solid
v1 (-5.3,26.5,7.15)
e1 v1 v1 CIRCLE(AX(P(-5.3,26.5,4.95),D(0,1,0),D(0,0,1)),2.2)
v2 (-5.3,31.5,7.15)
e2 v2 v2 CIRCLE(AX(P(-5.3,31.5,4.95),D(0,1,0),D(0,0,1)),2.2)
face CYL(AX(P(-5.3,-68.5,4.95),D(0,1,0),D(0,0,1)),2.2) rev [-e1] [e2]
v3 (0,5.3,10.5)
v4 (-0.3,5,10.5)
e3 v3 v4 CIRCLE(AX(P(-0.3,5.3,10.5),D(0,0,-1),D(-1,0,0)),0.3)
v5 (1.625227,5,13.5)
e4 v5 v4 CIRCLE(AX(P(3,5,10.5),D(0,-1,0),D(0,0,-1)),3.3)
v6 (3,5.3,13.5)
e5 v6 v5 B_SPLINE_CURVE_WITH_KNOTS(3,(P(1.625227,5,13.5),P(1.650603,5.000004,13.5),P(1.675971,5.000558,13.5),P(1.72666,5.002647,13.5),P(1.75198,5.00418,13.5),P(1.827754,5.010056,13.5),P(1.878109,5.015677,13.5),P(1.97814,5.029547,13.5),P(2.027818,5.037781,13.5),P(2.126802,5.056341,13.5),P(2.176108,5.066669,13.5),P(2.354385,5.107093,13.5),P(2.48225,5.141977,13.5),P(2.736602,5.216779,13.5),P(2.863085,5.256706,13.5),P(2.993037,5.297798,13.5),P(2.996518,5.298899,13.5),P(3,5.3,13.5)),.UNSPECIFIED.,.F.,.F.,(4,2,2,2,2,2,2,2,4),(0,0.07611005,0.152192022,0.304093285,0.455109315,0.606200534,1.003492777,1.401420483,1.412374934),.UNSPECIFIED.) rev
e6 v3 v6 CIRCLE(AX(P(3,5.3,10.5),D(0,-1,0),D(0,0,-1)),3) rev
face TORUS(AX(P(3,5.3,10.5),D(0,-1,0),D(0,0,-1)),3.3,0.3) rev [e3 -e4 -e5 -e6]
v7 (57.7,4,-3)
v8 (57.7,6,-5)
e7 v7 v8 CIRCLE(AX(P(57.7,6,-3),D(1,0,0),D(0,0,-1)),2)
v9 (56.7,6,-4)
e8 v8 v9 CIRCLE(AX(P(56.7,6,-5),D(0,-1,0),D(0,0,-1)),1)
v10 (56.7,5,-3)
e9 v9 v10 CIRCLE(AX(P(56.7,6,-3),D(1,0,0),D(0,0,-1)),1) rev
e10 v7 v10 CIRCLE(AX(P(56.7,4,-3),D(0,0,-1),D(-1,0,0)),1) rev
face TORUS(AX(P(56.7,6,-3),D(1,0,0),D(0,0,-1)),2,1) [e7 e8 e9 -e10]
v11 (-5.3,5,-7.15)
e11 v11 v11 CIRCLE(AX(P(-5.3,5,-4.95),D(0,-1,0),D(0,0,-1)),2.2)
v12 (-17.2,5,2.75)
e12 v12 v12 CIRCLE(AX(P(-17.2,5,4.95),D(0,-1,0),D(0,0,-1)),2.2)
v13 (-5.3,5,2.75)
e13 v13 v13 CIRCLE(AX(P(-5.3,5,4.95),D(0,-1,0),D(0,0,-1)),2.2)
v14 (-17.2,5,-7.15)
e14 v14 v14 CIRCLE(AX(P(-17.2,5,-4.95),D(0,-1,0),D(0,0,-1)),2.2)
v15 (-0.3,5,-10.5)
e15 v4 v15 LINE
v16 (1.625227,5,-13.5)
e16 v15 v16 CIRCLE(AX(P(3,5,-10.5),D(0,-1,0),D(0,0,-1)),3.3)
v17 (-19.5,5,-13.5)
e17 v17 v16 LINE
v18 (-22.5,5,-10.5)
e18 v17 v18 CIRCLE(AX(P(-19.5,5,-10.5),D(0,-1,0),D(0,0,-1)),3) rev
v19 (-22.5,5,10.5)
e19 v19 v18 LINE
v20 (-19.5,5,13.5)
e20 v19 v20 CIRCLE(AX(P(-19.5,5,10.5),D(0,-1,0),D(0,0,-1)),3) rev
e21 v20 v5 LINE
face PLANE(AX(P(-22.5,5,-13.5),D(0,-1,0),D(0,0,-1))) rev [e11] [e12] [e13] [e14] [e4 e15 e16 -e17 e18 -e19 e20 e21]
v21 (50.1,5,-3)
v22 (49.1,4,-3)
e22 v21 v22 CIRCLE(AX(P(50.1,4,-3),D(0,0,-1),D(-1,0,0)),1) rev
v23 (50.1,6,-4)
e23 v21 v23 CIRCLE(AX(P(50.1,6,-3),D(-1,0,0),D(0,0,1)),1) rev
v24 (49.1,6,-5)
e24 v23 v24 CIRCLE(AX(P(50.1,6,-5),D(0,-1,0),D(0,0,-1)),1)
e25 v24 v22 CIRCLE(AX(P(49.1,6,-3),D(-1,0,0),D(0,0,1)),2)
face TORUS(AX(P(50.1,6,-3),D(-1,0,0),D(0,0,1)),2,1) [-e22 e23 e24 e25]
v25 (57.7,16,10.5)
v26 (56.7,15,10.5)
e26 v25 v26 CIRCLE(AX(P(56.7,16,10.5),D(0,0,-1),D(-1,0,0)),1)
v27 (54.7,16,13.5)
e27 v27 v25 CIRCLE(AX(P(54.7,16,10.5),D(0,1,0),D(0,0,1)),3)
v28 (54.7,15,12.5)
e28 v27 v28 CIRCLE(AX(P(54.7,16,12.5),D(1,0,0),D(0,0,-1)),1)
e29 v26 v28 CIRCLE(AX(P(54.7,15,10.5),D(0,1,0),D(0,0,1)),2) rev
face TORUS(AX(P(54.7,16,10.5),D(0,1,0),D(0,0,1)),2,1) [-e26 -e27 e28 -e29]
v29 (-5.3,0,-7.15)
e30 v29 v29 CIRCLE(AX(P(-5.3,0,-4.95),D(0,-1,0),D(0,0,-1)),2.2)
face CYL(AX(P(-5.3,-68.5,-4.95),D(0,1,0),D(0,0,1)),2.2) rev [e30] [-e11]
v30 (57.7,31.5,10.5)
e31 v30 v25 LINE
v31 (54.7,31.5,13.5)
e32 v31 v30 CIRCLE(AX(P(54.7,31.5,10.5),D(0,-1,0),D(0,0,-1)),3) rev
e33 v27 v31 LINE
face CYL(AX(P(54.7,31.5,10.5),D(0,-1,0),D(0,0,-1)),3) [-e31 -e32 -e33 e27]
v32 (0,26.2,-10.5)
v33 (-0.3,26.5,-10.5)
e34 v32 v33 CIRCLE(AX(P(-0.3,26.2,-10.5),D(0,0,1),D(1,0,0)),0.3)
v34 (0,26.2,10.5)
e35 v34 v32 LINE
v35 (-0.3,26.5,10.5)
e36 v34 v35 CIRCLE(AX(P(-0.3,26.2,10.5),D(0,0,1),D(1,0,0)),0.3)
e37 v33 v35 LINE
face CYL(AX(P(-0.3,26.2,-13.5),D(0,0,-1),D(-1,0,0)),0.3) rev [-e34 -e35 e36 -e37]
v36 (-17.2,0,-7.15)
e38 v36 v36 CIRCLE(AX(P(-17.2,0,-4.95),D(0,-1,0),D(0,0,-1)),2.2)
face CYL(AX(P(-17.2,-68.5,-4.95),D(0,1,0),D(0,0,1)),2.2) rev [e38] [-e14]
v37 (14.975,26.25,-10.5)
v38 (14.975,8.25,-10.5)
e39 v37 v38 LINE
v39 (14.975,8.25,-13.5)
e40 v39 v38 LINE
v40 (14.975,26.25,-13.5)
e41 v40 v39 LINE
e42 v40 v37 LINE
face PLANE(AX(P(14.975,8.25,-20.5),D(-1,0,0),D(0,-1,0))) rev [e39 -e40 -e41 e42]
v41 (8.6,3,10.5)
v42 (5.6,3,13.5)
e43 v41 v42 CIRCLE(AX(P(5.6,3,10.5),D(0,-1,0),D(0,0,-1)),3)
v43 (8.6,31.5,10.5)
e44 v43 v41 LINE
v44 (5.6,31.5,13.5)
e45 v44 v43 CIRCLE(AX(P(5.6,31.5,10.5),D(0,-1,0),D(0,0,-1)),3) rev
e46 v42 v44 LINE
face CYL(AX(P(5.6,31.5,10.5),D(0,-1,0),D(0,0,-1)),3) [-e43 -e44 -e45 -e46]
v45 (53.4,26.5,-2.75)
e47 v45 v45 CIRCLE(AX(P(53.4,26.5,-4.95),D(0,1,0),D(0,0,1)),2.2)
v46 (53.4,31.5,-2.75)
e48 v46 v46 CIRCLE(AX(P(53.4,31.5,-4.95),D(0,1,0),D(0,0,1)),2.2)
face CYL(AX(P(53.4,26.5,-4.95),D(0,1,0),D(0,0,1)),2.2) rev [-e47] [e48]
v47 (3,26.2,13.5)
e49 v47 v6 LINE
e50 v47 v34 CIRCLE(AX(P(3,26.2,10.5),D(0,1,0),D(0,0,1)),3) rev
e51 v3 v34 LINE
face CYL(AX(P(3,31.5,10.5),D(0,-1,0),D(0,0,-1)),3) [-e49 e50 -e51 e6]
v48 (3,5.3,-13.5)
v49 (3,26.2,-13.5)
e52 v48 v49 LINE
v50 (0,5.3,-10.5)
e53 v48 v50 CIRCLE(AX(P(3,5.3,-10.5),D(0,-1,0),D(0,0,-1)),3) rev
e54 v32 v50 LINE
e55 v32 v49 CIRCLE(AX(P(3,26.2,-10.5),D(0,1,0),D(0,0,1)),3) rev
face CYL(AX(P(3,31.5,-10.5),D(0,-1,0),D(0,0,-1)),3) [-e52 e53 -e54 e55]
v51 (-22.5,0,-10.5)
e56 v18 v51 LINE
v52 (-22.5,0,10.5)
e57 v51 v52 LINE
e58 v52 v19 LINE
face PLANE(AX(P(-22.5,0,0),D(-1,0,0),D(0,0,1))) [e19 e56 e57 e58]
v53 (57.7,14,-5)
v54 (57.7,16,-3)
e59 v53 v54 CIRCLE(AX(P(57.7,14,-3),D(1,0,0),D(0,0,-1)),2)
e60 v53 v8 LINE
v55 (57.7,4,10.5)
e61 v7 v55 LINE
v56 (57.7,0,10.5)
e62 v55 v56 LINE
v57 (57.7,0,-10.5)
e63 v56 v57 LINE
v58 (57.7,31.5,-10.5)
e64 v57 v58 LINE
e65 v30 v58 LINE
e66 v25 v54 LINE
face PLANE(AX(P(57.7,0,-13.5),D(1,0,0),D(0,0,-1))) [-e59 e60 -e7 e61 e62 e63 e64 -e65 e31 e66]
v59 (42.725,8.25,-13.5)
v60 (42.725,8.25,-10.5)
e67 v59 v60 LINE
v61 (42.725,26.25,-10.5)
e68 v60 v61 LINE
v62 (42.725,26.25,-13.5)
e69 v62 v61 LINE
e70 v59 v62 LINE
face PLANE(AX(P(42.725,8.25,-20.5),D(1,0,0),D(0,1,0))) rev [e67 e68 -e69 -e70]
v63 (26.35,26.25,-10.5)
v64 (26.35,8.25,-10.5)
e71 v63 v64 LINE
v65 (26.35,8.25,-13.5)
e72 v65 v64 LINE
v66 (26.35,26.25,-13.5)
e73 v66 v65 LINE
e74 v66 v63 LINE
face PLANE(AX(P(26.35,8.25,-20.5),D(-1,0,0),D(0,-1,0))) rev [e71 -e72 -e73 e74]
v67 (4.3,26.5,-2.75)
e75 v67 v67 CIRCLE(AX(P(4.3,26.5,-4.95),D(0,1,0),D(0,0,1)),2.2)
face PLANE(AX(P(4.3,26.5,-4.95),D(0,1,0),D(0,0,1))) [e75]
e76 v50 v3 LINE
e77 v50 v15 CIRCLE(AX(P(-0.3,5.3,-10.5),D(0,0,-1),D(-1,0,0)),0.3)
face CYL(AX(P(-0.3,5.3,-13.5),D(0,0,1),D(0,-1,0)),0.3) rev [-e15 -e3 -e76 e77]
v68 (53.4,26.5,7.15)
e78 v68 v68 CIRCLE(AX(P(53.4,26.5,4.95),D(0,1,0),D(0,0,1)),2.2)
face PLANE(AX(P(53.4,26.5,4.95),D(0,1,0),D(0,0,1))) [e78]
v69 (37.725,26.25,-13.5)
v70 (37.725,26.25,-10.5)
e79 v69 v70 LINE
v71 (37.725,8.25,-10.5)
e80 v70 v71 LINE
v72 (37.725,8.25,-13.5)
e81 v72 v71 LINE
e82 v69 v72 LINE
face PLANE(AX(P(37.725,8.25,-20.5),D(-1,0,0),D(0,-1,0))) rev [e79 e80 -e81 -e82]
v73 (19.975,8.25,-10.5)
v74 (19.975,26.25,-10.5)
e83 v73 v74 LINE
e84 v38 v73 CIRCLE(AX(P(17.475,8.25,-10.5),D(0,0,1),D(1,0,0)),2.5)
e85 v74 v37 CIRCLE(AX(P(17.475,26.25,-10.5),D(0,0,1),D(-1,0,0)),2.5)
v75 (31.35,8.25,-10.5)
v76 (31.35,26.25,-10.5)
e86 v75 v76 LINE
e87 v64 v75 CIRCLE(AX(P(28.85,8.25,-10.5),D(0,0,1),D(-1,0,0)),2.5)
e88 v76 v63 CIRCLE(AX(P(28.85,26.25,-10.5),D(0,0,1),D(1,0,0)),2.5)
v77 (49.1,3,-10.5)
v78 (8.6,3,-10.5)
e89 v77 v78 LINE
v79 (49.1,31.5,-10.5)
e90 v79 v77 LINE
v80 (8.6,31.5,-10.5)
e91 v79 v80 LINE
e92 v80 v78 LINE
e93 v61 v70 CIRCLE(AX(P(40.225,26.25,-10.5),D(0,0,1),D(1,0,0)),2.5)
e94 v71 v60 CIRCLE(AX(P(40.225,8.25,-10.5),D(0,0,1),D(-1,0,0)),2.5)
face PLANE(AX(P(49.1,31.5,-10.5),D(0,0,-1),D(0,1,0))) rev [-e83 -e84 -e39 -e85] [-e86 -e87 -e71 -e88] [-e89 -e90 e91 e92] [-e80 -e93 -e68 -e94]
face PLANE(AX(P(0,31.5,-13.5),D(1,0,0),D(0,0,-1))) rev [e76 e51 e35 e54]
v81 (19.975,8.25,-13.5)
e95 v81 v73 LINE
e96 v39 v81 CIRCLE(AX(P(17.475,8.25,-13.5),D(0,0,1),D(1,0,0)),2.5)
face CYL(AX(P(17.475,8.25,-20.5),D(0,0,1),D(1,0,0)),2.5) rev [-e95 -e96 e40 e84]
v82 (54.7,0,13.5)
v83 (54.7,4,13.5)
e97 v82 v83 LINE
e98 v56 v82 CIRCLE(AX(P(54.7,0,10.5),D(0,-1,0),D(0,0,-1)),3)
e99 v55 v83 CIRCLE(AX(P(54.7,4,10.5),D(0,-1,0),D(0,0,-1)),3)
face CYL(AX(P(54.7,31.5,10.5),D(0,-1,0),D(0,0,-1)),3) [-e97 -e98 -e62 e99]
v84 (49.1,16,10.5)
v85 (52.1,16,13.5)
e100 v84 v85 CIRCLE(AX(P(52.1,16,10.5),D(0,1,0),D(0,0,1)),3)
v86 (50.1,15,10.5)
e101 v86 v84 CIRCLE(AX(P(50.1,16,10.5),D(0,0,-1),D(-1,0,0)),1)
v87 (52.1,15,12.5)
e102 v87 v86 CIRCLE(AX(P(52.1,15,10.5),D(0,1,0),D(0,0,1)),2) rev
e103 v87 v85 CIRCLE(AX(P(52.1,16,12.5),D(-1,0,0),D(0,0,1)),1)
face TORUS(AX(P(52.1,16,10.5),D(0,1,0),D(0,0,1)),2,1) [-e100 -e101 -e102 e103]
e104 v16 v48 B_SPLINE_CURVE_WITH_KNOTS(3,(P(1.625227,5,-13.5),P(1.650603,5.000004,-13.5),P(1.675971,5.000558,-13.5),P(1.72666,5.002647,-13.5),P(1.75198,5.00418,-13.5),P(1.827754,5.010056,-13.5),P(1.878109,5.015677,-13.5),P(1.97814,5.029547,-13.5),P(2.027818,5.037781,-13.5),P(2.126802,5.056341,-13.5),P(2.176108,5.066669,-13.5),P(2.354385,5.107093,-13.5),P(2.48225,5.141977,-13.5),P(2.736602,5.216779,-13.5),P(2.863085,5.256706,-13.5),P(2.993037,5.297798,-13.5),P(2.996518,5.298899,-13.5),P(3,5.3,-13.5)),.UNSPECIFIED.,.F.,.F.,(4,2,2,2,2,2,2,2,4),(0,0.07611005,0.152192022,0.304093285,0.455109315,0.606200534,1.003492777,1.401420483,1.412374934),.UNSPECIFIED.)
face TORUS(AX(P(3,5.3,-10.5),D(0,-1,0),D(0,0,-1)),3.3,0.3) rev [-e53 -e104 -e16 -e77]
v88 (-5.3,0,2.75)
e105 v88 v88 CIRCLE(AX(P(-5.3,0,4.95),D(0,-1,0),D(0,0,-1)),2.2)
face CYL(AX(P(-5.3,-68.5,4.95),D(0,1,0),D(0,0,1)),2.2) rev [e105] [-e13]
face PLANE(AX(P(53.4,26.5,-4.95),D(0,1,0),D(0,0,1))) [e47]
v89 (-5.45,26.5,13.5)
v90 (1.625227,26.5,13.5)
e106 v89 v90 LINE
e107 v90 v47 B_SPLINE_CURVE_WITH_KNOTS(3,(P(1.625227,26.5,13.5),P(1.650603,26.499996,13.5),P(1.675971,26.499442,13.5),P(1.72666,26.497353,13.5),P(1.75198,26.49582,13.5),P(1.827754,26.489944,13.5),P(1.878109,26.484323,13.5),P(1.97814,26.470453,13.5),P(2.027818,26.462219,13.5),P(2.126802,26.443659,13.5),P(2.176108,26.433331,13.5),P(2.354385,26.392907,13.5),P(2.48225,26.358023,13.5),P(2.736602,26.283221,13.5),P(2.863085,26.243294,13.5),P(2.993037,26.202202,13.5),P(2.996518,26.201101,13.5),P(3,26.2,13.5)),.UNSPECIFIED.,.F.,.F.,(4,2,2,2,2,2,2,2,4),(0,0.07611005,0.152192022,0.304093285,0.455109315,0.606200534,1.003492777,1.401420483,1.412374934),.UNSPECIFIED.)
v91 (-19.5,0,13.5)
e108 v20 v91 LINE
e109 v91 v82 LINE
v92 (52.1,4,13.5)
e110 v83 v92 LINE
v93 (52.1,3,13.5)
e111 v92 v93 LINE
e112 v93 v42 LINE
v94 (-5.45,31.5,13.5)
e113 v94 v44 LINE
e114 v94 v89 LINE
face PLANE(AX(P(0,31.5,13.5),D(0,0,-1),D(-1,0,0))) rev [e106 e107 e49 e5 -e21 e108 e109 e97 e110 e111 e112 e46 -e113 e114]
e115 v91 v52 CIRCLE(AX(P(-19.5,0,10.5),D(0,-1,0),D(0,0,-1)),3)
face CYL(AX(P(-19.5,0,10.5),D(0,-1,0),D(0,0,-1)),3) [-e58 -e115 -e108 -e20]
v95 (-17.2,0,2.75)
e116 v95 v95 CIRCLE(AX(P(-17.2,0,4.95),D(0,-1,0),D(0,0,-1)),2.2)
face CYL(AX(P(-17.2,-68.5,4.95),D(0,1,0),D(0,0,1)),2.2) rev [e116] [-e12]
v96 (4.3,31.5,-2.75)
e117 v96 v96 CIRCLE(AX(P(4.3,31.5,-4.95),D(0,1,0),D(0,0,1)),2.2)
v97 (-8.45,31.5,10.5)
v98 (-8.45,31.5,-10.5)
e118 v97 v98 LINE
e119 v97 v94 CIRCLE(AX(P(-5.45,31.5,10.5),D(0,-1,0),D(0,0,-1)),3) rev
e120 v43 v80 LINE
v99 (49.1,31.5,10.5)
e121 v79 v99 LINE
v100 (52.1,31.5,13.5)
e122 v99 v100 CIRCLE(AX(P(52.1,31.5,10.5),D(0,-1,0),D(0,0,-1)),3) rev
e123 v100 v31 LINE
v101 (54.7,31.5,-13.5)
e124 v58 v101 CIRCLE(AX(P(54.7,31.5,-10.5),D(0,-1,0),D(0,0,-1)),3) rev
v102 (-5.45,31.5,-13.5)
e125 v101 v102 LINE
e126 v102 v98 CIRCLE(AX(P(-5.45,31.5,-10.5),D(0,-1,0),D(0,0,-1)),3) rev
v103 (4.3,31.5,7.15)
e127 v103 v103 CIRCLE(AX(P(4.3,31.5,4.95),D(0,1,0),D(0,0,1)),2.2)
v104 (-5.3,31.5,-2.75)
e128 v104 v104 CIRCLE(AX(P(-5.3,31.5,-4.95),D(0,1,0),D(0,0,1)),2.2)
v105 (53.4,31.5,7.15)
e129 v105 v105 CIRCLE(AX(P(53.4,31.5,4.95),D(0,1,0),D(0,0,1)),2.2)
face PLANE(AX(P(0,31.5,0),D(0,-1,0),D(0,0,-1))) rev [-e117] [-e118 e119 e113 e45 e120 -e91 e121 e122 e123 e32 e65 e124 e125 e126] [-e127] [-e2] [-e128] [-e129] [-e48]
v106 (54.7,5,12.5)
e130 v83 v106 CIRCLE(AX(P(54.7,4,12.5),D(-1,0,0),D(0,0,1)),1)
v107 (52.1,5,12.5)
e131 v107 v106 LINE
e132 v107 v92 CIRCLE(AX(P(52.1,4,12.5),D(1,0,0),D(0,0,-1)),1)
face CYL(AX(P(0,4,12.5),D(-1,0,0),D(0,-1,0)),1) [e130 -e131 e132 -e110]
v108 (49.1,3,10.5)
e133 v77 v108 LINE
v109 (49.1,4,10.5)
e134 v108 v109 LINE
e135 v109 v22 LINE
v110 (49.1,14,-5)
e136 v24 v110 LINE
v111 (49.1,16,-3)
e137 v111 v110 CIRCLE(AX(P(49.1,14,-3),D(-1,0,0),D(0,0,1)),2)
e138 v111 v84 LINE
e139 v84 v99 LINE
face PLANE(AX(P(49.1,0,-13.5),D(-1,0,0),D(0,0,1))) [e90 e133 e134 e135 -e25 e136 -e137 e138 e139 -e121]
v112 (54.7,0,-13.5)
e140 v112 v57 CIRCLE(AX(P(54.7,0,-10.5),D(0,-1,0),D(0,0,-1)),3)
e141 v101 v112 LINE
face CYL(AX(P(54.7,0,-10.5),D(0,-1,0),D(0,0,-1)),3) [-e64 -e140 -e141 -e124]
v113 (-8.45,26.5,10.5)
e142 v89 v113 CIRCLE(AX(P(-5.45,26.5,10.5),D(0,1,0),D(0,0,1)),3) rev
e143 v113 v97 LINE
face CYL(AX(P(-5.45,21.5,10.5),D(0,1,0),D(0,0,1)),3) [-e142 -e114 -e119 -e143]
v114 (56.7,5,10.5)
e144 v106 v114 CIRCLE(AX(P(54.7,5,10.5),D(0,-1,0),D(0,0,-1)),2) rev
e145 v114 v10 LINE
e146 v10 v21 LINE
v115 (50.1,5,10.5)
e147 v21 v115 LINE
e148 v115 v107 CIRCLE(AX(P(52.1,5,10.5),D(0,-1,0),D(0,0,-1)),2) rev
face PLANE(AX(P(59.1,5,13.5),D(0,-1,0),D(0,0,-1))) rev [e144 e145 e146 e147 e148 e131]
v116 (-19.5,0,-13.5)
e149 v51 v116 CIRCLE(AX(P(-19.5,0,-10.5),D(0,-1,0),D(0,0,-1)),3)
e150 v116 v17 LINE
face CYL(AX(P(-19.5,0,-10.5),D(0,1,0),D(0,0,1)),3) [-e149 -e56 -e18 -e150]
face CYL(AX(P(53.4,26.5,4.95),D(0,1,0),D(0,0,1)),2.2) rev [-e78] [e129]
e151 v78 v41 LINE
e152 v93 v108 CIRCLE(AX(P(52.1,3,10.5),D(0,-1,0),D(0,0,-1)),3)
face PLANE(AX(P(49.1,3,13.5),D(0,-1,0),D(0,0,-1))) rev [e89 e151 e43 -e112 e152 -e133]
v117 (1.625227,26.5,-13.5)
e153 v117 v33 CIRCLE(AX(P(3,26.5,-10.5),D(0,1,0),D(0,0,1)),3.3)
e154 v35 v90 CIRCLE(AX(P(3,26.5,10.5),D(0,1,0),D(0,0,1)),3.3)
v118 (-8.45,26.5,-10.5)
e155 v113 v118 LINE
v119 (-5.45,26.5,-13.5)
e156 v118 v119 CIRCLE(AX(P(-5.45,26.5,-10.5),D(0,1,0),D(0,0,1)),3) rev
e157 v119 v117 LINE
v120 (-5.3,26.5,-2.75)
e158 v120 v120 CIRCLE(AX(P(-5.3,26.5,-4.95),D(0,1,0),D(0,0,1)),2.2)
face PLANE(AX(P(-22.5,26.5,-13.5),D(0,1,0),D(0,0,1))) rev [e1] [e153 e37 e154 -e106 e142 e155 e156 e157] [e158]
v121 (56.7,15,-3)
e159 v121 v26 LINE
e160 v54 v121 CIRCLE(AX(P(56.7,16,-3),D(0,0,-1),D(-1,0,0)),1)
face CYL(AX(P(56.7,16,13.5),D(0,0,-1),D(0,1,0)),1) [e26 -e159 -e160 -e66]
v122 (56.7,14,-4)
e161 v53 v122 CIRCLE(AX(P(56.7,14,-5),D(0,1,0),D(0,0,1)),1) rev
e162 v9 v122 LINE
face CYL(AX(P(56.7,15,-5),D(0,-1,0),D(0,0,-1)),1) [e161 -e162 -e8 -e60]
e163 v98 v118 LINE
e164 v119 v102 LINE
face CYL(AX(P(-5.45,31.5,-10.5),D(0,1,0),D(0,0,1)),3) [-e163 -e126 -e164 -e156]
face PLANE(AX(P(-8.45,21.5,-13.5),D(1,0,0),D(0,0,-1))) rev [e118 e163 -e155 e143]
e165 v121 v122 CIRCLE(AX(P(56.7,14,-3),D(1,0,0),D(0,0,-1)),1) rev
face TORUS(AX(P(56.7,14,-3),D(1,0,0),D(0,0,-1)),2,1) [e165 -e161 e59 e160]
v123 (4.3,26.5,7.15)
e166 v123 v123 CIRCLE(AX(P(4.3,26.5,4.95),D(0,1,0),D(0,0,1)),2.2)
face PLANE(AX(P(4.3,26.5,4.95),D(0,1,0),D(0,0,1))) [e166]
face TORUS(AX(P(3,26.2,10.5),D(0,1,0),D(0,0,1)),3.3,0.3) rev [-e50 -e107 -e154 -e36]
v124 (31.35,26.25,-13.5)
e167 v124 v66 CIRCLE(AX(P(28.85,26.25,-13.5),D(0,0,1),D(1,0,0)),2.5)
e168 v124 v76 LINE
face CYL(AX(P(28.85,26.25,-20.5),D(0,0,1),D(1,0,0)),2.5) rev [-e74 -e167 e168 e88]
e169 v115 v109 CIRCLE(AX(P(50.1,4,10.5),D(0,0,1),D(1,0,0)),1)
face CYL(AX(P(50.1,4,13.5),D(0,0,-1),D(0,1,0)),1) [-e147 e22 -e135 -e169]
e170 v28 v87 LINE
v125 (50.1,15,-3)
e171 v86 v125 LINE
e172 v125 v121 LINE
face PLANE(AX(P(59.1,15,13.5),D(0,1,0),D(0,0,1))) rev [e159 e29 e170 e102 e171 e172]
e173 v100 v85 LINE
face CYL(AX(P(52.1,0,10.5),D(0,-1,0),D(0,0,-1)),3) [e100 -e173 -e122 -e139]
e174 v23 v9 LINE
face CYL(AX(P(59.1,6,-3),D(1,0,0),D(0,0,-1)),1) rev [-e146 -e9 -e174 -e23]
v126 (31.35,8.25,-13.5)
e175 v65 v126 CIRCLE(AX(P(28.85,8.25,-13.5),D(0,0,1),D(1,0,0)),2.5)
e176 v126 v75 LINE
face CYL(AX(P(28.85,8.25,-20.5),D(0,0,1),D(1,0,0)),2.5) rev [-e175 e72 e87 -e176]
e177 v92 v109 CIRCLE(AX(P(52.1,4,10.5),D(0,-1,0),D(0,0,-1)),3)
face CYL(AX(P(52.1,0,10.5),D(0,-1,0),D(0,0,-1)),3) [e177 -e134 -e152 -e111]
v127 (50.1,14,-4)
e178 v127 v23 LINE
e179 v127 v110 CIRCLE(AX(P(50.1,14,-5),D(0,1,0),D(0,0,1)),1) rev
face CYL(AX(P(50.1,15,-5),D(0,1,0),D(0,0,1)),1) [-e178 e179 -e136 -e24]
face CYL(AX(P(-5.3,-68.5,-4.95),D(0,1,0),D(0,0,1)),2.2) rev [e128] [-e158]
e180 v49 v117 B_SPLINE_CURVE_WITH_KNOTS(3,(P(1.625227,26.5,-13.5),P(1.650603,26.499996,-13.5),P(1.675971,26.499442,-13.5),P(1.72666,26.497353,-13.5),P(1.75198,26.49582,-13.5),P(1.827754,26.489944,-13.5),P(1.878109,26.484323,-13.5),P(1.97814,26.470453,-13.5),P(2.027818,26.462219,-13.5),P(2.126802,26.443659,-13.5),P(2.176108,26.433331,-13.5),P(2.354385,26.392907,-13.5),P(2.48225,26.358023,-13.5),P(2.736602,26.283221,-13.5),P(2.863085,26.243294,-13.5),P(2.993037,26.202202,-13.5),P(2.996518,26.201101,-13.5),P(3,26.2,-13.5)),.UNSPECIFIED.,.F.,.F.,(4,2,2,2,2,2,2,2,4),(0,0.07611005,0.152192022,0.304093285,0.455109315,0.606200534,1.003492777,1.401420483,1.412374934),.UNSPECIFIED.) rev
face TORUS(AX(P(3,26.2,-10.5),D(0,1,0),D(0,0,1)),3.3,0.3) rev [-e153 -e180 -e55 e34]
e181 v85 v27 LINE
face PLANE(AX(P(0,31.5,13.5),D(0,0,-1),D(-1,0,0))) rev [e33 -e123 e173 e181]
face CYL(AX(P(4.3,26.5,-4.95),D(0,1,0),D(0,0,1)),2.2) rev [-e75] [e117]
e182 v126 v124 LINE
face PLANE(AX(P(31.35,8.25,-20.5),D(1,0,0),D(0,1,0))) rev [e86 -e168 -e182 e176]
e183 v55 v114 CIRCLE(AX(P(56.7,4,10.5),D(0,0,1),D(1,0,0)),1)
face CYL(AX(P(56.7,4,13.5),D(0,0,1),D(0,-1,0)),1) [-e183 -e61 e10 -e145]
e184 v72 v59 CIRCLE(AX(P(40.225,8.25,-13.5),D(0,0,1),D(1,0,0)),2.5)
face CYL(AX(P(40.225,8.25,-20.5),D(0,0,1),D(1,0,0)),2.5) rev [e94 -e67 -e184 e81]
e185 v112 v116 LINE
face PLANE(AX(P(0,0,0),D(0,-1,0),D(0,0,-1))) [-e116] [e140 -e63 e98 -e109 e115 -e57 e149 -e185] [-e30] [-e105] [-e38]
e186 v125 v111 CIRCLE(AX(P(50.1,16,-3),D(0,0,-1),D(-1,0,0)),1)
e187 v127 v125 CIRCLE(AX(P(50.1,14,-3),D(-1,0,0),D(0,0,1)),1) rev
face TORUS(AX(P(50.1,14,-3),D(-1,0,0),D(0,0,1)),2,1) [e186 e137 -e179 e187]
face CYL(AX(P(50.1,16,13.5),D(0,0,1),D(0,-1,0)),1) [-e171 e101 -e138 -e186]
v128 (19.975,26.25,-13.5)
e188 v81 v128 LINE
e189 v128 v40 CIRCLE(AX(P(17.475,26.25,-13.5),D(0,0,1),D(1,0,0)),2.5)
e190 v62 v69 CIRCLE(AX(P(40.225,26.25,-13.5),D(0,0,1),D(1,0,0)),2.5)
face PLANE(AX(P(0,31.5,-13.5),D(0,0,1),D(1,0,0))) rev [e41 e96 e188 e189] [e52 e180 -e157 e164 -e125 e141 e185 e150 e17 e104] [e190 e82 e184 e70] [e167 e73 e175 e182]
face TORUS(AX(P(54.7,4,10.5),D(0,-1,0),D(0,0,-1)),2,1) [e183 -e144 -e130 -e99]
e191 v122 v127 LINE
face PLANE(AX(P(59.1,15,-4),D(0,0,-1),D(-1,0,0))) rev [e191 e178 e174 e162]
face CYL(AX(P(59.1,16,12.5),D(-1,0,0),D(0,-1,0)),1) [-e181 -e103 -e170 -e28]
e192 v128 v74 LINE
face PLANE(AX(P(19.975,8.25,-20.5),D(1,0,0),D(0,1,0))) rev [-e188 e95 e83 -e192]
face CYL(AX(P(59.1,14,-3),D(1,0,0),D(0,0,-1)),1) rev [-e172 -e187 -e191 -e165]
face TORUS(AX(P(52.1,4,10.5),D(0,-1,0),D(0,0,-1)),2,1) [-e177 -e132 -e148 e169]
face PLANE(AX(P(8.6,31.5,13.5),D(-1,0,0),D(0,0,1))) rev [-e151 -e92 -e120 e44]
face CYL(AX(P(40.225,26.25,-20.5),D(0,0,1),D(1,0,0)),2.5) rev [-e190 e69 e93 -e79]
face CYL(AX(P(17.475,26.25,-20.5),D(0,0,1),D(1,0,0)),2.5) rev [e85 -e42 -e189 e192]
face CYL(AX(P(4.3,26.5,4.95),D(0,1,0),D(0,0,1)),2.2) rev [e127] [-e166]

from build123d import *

# Parameters (mm, degrees)
SKETCH1_W           = 8.6
SKETCH1_H           = 27
BOSS_EXTRUDE1_DEPTH = 31.5
SKETCH2_W           = 27
SKETCH2_H           = 3
BOSS_EXTRUDE2_DEPTH = 40.5
SKETCH3_W           = 3
SKETCH3_H           = 28.5
BOSS_EXTRUDE3_DEPTH = 40.5
SKETCH4_W           = 8.6
SKETCH4_H           = 27
BOSS_EXTRUDE4_DEPTH = 31.5
CUT_EXTRUDE8_DEPTH  = 10
FILLET1_R           = 3
SKETCH5_R           = 2.2
CUT_EXTRUDE1_DEPTH  = 5
SKETCH6_W           = 17.5
SKETCH6_H           = 10
CUT_EXTRUDE2_DEPTH  = 10
FILLET3_R           = 1
SKETCH9_W           = 27
SKETCH9_H           = 5
BOSS_EXTRUDE5_DEPTH = 22.5
SKETCH10_R          = 2.2
CUT_EXTRUDE5_DEPTH  = 100
FILLET4_R           = 3
FILLET5_R           = 0.3
SKETCH12_W          = 14.05
SKETCH12_H          = 27
CUT_EXTRUDE6_DEPTH  = 10
FILLET6_R           = 3


with BuildPart() as part:
    # Sketch1 → Boss-Extrude1 (new body)
    with BuildSketch(Plane(origin=(0, 0, 0), x_dir=(1, 0, 0), z_dir=(0, 1, 0))):
        with Locations((4.3, 0)):
            Rectangle(SKETCH1_W, SKETCH1_H)
    extrude(amount=BOSS_EXTRUDE1_DEPTH)

    # Sketch2 → Boss-Extrude2 (add)
    with BuildSketch(Plane(origin=(8.6, 0, 0), x_dir=(0, 0, -1), z_dir=(1, 0, 0))):
        with Locations((0, 1.5)):
            Rectangle(SKETCH2_W, SKETCH2_H)
    extrude(amount=BOSS_EXTRUDE2_DEPTH)

    # Sketch3 → Boss-Extrude3 (add)
    with BuildSketch(Plane(origin=(8.6, 0, 0), x_dir=(0, 0, -1), z_dir=(1, 0, 0))):
        with Locations((12, 17.25)):
            Rectangle(SKETCH3_W, SKETCH3_H)
    extrude(amount=BOSS_EXTRUDE3_DEPTH)

    # Sketch4 → Boss-Extrude4 (add)
    with BuildSketch(Plane(origin=(0, 31.5, 0), x_dir=(1, 0, 0), z_dir=(0, 1, 0))):
        with Locations((53.4, 0)):
            Rectangle(SKETCH4_W, SKETCH4_H)
    extrude(amount=-BOSS_EXTRUDE4_DEPTH)

    # Sketch15 → Cut-Extrude8 (cut)
    with BuildSketch(Plane.XY.offset(-10.5)):
        with BuildLine():
            Line((31.35, 8.25), (31.35, 26.25))
            ThreePointArc((31.35, 26.25), (28.85, 28.75), (26.35, 26.25))
            Line((26.35, 26.25), (26.35, 8.25))
            ThreePointArc((26.35, 8.25), (28.85, 5.75), (31.35, 8.25))
        make_face()
        with BuildLine():
            Line((42.725, 8.25), (42.725, 26.25))
            ThreePointArc((42.725, 26.25), (40.225, 28.75), (37.725, 26.25))
            Line((37.725, 26.25), (37.725, 8.25))
            ThreePointArc((37.725, 8.25), (40.225, 5.75), (42.725, 8.25))
        make_face()
        with BuildLine():
            Line((19.975, 8.25), (19.975, 26.25))
            ThreePointArc((19.975, 26.25), (17.475, 28.75), (14.975, 26.25))
            Line((14.975, 26.25), (14.975, 8.25))
            ThreePointArc((14.975, 8.25), (17.475, 5.75), (19.975, 8.25))
        make_face()
    extrude(amount=-CUT_EXTRUDE8_DEPTH, mode=Mode.SUBTRACT)

    # Fillet1
    fillet1_edges = [part.edges().sort_by_distance(p)[0] for p in [
        (57.7, 15.75, -13.5),
        (57.7, 15.75, 13.5),
        (49.1, 17.25, 13.5),
        (8.6, 17.25, 13.5),
    ]]
    fillet(fillet1_edges, radius=FILLET1_R)

    # Sketch5 → Cut-Extrude1 (cut)
    with BuildSketch(Plane(origin=(0, 31.5, 0), x_dir=(1, 0, 0), z_dir=(0, 1, 0))):
        with Locations(Location((53.4, 4.95, 0), (0, 0, 270))):
            Circle(SKETCH5_R)
        with Locations(Location((53.4, -4.95, 0), (0, 0, 270))):
            Circle(SKETCH5_R)
        with Locations(Location((4.3, 4.95, 0), (0, 0, 270))):
            Circle(SKETCH5_R)
        with Locations(Location((4.3, -4.95, 0), (0, 0, 270))):
            Circle(SKETCH5_R)
    extrude(amount=-CUT_EXTRUDE1_DEPTH, mode=Mode.SUBTRACT)

    # Sketch6 → Cut-Extrude2 (cut)
    with BuildSketch(Plane.ZY.offset(-49.1)):
        with Locations((4.75, 10)):
            Rectangle(SKETCH6_W, SKETCH6_H)
    extrude(amount=-CUT_EXTRUDE2_DEPTH, mode=Mode.SUBTRACT)

    # Fillet3
    fillet3_edges = [part.edges().sort_by_distance(p)[0] for p in [
        (56.821320344, 5, 12.621320344),
        (56.821320344, 15, 12.621320344),
        (57.7, 10, -4),
        (49.1, 5, 3.25),
        (49.1, 15, 3.25),
        (49.1, 10, -4),
        (49.978679656, 15, 12.621320344),
        (57.7, 15, 3.25),
        (53.4, 15, 13.5),
        (49.978679656, 5, 12.621320344),
        (57.7, 5, 3.25),
        (53.4, 15, -4),
        (53.4, 5, 13.5),
        (53.4, 5, -4),
    ]]
    fillet(fillet3_edges, radius=FILLET3_R)

    # Sketch9 → Boss-Extrude5 (add)
    with BuildSketch(Plane.ZY):
        with Locations((0, 29)):
            Rectangle(SKETCH9_W, SKETCH9_H)
        with Locations((0, 2.5)):
            Rectangle(SKETCH9_W, SKETCH9_H)
    extrude(amount=BOSS_EXTRUDE5_DEPTH)

    # Sketch10 → Cut-Extrude5 (cut)
    with BuildSketch(Plane(origin=(0, 31.5, 0), x_dir=(1, 0, 0), z_dir=(0, 1, 0))):
        with Locations(Location((-5.3, 4.95, 0), (0, 0, 90))):
            Circle(SKETCH10_R)
        with Locations(Location((-5.3, -4.95, 0), (0, 0, 90))):
            Circle(SKETCH10_R)
        with Locations(Location((-17.2, -4.95, 0), (0, 0, 90))):
            Circle(SKETCH10_R)
        with Locations(Location((-17.2, 4.95, 0), (0, 0, 90))):
            Circle(SKETCH10_R)
    extrude(amount=-CUT_EXTRUDE5_DEPTH, mode=Mode.SUBTRACT)

    # Fillet4
    fillet4_edges = [part.edges().sort_by_distance(p)[0] for p in [
        (0, 15.75, 13.5),
        (0, 15.75, -13.5),
        (-22.5, 2.5, 13.5),
        (-22.5, 2.5, -13.5),
    ]]
    fillet(fillet4_edges, radius=FILLET4_R)

    # Fillet5
    # the kernel refuses this fillet: 0.3 mm, written as the material it adds along each edge
    with BuildSketch(Plane(origin=(0, 5, 10.5), x_dir=(0, 1, 0), z_dir=(0, 0, -1))) as fillet5_piece_1:
        with BuildLine():
            CenterArc((FILLET5_R, -FILLET5_R), FILLET5_R, 90, 90)
            Line((0, -FILLET5_R), (0, 0))
            Line((0, 0), (FILLET5_R, 0))
        make_face()
    extrude(amount=21)
    with BuildSketch(Plane(origin=(0, 26.5, 10.5), x_dir=(0, -1, 0), z_dir=(0, 0, -1))) as fillet5_piece_2:
        with BuildLine():
            CenterArc((FILLET5_R, FILLET5_R), FILLET5_R, 180, 90)
            Line((0, FILLET5_R), (0, 0))
            Line((0, 0), (FILLET5_R, 0))
        make_face()
    extrude(amount=21)
    with BuildSketch(Plane(origin=(3, 5, -10.5), x_dir=(-1, 0, 0), z_dir=(0, 0, 1))) as fillet5_piece_3_section:
        with BuildLine():
            CenterArc((3 + FILLET5_R, -FILLET5_R), FILLET5_R, 90, 90)
            Line((3 + FILLET5_R, 0), (3, 0))
            Line((3, 0), (3, -FILLET5_R))
        make_face()
    fillet5_piece_3 = revolve(axis=Axis((3, 5, -10.5), (0, -1, 0)), revolution_arc=104.329698924, mode=Mode.PRIVATE)
    fillet5_piece_3 = split(fillet5_piece_3, bisect_by=Plane(origin=(0.81861369, 5.084946104, -13.5), z_dir=(0, 0, 1)), keep=Keep.TOP, mode=Mode.PRIVATE)
    add(fillet5_piece_3)
    with BuildSketch(Plane(origin=(3, 26.5, -10.5), x_dir=(-1, 0, 0), z_dir=(0, 0, 1))) as fillet5_piece_4_section:
        with BuildLine():
            CenterArc((3 + FILLET5_R, FILLET5_R), FILLET5_R, 180, 90)
            Line((3 + FILLET5_R, 0), (3, 0))
            Line((3, 0), (3, FILLET5_R))
        make_face()
    fillet5_piece_4 = revolve(axis=Axis((3, 26.5, -10.5), (0, -1, 0)), revolution_arc=104.329698924, mode=Mode.PRIVATE)
    fillet5_piece_4 = split(fillet5_piece_4, bisect_by=Plane(origin=(0.81861369, 26.415053896, -13.5), z_dir=(0, 0, 1)), keep=Keep.TOP, mode=Mode.PRIVATE)
    add(fillet5_piece_4)
    with BuildSketch(Plane(origin=(3, 5, 10.5), x_dir=(0.24750126301206385, 0, 0.968887570777659), z_dir=(0.968887570777659, 0, -0.24750126301206385))) as fillet5_piece_5_section:
        with BuildLine():
            CenterArc((3 + FILLET5_R, -FILLET5_R), FILLET5_R, 90, 90)
            Line((3 + FILLET5_R, 0), (3, 0))
            Line((3, 0), (3, -FILLET5_R))
        make_face()
    fillet5_piece_5 = revolve(axis=Axis((3, 5, 10.5), (0, -1, 0)), revolution_arc=104.329698924, mode=Mode.PRIVATE)
    fillet5_piece_5 = split(fillet5_piece_5, bisect_by=Plane(origin=(0.818613701, 5.084946089, 13.5), z_dir=(0, 0, -1)), keep=Keep.TOP, mode=Mode.PRIVATE)
    add(fillet5_piece_5)
    with BuildSketch(Plane(origin=(3, 26.5, 10.5), x_dir=(0.24750126301206454, 0, 0.9688875707776589), z_dir=(0.9688875707776589, 0, -0.24750126301206454))) as fillet5_piece_6_section:
        with BuildLine():
            CenterArc((3 + FILLET5_R, FILLET5_R), FILLET5_R, 180, 90)
            Line((3, FILLET5_R), (3, 0))
            Line((3, 0), (3 + FILLET5_R, 0))
        make_face()
    fillet5_piece_6 = revolve(axis=Axis((3, 26.5, 10.5), (0, -1, 0)), revolution_arc=104.329698924, mode=Mode.PRIVATE)
    fillet5_piece_6 = split(fillet5_piece_6, bisect_by=Plane(origin=(0.818613746, 26.41505391, 13.5), z_dir=(0, 0, -1)), keep=Keep.TOP, mode=Mode.PRIVATE)
    add(fillet5_piece_6)

    # Sketch12 → Cut-Extrude6 (cut)
    with BuildSketch(Plane(origin=(0, 31.5, 0), x_dir=(1, 0, 0), z_dir=(0, 1, 0))):
        with Locations((-15.475, 0)):
            Rectangle(SKETCH12_W, SKETCH12_H)
    extrude(amount=-CUT_EXTRUDE6_DEPTH, mode=Mode.SUBTRACT)

    # Fillet6
    fillet6_edges = [part.edges().sort_by_distance(p)[0] for p in [
        (-8.45, 29, -13.5),
        (-8.45, 29, 13.5),
    ]]
    fillet(fillet6_edges, radius=FILLET6_R)


solid = part.part
